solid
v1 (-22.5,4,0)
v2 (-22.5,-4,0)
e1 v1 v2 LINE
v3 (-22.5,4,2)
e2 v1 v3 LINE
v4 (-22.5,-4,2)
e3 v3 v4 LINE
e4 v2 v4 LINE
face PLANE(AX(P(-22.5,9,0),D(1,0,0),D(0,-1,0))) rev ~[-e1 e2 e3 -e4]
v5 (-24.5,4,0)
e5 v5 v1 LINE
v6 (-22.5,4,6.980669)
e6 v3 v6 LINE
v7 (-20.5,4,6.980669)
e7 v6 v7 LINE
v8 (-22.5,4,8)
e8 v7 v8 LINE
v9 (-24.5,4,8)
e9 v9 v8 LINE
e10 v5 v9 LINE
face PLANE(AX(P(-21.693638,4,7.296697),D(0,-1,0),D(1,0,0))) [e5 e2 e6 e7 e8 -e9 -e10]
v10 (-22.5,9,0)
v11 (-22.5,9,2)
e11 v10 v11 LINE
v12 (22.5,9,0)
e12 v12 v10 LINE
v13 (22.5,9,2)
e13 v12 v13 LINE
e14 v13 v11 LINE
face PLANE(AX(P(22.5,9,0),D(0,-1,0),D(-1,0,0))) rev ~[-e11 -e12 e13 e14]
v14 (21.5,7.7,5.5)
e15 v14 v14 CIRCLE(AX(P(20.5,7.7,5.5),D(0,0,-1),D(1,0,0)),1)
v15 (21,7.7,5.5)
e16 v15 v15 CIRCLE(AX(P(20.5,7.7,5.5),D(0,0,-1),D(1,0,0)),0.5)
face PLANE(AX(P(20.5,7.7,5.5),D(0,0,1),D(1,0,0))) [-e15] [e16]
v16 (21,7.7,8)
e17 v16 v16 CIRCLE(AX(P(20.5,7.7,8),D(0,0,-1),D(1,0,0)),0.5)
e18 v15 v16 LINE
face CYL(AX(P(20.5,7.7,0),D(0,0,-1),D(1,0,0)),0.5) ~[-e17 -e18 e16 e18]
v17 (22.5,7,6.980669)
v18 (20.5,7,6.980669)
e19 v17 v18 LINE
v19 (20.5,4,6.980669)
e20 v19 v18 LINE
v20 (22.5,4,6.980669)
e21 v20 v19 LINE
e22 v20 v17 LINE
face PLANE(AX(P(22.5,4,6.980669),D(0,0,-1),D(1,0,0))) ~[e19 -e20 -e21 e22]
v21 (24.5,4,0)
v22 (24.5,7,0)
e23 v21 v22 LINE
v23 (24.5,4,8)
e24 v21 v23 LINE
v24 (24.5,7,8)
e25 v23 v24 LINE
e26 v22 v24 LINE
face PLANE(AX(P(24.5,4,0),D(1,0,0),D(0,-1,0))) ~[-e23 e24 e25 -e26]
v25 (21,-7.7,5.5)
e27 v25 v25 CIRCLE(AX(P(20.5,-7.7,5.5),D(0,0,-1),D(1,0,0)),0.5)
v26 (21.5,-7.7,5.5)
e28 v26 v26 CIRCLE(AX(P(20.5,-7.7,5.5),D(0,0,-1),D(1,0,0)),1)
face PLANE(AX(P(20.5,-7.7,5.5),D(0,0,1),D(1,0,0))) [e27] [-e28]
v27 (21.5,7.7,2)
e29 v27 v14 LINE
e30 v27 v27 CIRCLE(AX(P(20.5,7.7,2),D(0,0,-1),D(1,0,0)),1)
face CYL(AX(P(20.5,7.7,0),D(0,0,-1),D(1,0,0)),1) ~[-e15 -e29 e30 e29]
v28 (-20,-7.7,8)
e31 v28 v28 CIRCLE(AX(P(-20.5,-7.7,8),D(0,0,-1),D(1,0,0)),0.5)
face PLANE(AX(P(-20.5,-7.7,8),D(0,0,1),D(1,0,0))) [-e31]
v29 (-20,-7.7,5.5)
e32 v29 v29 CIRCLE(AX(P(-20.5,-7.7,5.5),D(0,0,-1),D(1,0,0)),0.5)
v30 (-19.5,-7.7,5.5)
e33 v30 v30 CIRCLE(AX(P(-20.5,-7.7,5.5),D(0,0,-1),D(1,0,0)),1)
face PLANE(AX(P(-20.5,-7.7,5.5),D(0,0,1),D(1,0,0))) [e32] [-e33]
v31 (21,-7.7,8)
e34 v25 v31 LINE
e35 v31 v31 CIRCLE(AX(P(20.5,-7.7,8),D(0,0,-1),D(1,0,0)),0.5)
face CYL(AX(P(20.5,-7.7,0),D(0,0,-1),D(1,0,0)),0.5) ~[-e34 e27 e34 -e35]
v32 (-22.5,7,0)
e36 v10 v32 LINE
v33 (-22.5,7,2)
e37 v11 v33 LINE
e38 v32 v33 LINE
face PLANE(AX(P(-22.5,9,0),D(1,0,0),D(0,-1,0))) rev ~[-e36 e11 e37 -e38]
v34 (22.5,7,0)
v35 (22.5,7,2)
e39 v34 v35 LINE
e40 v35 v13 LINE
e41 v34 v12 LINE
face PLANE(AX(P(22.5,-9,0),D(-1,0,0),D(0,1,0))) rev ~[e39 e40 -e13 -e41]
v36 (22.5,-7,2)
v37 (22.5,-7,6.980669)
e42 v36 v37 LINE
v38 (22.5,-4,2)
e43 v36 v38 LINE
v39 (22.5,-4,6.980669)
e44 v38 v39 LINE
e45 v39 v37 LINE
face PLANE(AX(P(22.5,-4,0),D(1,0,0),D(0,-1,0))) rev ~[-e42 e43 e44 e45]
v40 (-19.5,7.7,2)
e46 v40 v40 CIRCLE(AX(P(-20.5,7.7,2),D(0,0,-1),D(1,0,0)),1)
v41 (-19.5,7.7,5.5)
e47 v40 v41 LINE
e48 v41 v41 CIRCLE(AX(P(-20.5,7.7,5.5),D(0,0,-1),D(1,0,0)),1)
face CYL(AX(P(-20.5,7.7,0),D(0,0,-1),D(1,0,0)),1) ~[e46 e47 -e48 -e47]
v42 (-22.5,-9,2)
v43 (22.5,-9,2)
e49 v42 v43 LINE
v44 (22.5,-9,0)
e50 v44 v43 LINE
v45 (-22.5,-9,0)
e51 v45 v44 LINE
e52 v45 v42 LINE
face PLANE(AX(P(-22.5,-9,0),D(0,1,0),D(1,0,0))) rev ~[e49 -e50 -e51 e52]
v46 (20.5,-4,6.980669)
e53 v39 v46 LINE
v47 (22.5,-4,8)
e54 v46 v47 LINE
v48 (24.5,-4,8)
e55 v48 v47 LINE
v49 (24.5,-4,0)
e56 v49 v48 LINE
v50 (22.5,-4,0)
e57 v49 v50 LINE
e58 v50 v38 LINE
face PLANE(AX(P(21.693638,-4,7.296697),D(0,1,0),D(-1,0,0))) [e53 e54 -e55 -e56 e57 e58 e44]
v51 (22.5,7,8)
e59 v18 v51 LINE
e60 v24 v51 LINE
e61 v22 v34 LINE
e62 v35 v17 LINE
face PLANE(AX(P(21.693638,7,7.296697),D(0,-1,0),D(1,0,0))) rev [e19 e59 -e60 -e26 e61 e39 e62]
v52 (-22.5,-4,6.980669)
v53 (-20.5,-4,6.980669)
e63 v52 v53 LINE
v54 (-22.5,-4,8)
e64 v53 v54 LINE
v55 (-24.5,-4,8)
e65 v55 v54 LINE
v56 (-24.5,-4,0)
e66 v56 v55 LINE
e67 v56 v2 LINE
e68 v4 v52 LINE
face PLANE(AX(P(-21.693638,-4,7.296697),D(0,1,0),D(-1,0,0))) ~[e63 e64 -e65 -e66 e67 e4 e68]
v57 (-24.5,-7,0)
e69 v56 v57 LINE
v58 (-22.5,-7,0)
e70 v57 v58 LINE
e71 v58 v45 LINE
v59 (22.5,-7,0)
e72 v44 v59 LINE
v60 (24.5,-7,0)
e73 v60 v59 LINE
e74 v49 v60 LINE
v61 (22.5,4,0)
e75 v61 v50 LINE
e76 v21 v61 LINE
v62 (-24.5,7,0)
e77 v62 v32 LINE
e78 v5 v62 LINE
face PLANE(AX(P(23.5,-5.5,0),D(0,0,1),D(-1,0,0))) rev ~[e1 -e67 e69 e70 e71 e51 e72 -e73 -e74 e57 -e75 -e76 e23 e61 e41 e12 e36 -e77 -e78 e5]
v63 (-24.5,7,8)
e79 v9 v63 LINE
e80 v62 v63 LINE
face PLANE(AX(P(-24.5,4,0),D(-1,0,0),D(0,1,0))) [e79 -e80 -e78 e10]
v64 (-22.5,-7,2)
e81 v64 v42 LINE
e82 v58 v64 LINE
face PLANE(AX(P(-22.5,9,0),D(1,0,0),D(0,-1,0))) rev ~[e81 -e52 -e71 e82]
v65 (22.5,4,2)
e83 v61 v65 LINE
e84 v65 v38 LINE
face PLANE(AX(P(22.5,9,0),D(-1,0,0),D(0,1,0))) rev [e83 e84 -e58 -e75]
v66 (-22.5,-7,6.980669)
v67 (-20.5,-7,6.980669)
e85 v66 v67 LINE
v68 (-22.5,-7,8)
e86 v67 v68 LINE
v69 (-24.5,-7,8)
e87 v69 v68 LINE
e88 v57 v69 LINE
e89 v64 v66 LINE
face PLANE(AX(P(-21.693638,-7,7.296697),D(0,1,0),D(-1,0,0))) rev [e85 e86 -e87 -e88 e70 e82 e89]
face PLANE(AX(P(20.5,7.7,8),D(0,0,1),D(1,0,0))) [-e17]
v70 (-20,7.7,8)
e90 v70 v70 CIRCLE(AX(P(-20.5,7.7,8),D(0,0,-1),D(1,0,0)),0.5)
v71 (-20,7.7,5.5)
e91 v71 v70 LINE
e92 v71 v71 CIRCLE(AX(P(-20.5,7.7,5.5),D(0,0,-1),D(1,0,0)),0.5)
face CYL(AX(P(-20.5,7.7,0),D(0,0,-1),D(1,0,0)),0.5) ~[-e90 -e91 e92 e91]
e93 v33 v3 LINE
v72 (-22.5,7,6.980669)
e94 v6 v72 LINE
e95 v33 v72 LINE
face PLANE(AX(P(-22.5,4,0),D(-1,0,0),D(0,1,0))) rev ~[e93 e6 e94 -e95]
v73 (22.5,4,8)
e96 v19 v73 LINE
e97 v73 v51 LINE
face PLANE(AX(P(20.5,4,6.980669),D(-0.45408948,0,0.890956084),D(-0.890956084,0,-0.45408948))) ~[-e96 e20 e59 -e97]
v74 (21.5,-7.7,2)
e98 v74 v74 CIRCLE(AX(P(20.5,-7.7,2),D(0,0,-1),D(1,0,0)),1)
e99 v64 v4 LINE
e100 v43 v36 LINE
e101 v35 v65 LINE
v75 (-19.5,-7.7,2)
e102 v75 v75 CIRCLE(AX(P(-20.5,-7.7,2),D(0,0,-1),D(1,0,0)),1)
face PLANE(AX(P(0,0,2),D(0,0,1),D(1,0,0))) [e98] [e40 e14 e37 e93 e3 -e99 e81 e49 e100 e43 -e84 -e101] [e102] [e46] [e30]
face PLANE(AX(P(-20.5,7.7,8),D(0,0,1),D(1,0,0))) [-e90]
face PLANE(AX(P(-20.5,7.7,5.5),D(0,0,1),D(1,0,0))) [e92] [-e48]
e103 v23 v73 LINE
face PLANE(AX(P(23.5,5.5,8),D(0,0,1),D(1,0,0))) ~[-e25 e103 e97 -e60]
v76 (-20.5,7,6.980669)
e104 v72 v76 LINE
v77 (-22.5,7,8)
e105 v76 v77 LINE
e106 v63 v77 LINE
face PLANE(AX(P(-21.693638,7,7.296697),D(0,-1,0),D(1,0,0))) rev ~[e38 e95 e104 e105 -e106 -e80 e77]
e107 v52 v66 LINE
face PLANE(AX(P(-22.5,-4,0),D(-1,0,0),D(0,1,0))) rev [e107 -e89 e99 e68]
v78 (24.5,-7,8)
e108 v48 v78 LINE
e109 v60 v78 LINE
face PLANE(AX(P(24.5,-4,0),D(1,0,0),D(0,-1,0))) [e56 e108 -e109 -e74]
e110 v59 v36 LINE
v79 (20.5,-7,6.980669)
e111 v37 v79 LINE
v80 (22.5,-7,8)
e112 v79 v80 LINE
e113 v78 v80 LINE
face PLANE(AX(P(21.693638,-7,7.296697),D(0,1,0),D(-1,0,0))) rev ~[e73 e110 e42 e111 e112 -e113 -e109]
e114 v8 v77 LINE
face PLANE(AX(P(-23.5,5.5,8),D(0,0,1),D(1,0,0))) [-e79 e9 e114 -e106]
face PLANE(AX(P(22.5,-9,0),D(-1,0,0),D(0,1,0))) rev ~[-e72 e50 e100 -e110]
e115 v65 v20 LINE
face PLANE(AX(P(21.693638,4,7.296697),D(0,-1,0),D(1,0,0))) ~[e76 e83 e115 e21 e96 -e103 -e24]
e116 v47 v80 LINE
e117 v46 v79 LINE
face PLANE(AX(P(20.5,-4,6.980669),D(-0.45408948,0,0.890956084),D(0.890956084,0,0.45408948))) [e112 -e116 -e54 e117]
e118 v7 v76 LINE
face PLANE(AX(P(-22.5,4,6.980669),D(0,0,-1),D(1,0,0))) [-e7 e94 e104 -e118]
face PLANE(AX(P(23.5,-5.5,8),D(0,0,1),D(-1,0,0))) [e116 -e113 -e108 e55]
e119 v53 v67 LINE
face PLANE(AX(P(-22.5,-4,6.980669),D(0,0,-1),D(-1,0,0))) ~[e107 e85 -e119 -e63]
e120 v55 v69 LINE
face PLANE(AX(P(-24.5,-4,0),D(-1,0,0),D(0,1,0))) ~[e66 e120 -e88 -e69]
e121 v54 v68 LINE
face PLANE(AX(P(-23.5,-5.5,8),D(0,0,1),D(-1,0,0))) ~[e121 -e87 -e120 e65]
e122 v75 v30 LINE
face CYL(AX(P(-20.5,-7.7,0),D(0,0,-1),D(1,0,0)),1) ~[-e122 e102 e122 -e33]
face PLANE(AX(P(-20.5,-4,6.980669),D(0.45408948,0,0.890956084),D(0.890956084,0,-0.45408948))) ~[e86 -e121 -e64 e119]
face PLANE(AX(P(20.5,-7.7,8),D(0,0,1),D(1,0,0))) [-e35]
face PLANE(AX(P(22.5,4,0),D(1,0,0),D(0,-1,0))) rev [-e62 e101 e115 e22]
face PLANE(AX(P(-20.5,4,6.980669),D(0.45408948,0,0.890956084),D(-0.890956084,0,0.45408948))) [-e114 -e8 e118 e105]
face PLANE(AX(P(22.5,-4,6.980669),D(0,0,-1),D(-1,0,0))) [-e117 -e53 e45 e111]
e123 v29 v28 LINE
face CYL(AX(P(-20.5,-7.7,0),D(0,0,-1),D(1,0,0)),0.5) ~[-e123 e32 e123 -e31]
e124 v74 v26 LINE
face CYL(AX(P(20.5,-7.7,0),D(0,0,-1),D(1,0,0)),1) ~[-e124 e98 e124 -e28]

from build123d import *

# Parameters (mm, degrees)
F0_R     = 1
F0_R_2   = 0.5
F1_DEPTH = 2
F2_DEPTH = 5.5
F3_DEPTH = 8
F0_W     = 2
F0_H     = 3
F4_DEPTH = 8
F6_DEPTH = 3


# Not quite as in the source:
# - a feature names something its author has since deleted; it is built from what else it names


with BuildPart() as f1:
    # F0 (on Top) → F1 (new body)
    with BuildSketch(Plane.XY):
        Polygon((22.5, 9), (-22.5, 9), (-22.5, 7), (-22.5, 4), (-22.5, -4), (-22.5, -7), (-22.5, -9), (22.5, -9), (22.5, -7), (22.5, -4), (22.5, 4), (22.5, 7), align=None)
        with Locations((-20.5, -7.7)):
            Circle(F0_R, mode=Mode.SUBTRACT)
        with Locations((20.5, -7.7)):
            Circle(F0_R, mode=Mode.SUBTRACT)
        with Locations((-20.5, 7.7)):
            Circle(F0_R, mode=Mode.SUBTRACT)
        with Locations((20.5, 7.7)):
            Circle(F0_R, mode=Mode.SUBTRACT)
        with Locations((-20.5, 7.7)):
            Circle(F0_R)
        with Locations((-20.5, 7.7)):
            Circle(F0_R_2, mode=Mode.SUBTRACT)
        with Locations((20.5, 7.7)):
            Circle(F0_R)
        with Locations((20.5, 7.7)):
            Circle(F0_R_2, mode=Mode.SUBTRACT)
        with Locations((20.5, -7.7)):
            Circle(F0_R)
        with Locations((20.5, -7.7)):
            Circle(F0_R_2, mode=Mode.SUBTRACT)
        with Locations((-20.5, -7.7)):
            Circle(F0_R)
        with Locations((-20.5, -7.7)):
            Circle(F0_R_2, mode=Mode.SUBTRACT)
        with Locations((-20.5, 7.7)):
            Circle(F0_R_2)
        with Locations((20.5, 7.7)):
            Circle(F0_R_2)
        with Locations((20.5, -7.7)):
            Circle(F0_R_2)
        with Locations((-20.5, -7.7)):
            Circle(F0_R_2)
    extrude(amount=F1_DEPTH)

    # F0 (on Top) → F2 (join)
    with BuildSketch(Plane.XY):
        with Locations((-20.5, 7.7)):
            Circle(F0_R)
        with Locations((-20.5, 7.7)):
            Circle(F0_R_2, mode=Mode.SUBTRACT)
        with Locations((-20.5, 7.7)):
            Circle(F0_R_2)
        with Locations((-20.5, -7.7)):
            Circle(F0_R)
        with Locations((-20.5, -7.7)):
            Circle(F0_R_2, mode=Mode.SUBTRACT)
        with Locations((-20.5, -7.7)):
            Circle(F0_R_2)
        with Locations((20.5, 7.7)):
            Circle(F0_R)
        with Locations((20.5, 7.7)):
            Circle(F0_R_2, mode=Mode.SUBTRACT)
        with Locations((20.5, 7.7)):
            Circle(F0_R_2)
        with Locations((20.5, -7.7)):
            Circle(F0_R)
        with Locations((20.5, -7.7)):
            Circle(F0_R_2, mode=Mode.SUBTRACT)
        with Locations((20.5, -7.7)):
            Circle(F0_R_2)
    extrude(amount=F2_DEPTH)

    # F0 (on Top) → F3 (join)
    with BuildSketch(Plane.XY):
        with Locations((-20.5, 7.7)):
            Circle(F0_R_2)
        with Locations((20.5, 7.7)):
            Circle(F0_R_2)
        with Locations((20.5, -7.7)):
            Circle(F0_R_2)
        with Locations((-20.5, -7.7)):
            Circle(F0_R_2)
    extrude(amount=F3_DEPTH)

    # F0 (on Top) → F4 (join)
    with BuildSketch(Plane.XY):
        with Locations((-23.5, 5.5)):
            Rectangle(F0_W, F0_H)
    extrude(amount=F4_DEPTH)

    # F5 (on face) → F6 (join, through all)
    with BuildSketch(Plane.XZ.offset(-4)):
        Polygon((-22.5, 8), (-22.5, 6.980669219), (-20.5, 6.980669219), align=None)
    extrude(amount=-F6_DEPTH)

    # F7: F1 across plane


with BuildPart() as f1_1:
    add(f1.part)
    add(f1.part.mirror(Plane.XZ))

    # F8: F1 across plane


with BuildPart() as f1_2:
    add(f1_1.part)
    add(f1_1.part.mirror(Plane.YZ))


solid = f1_2.part
